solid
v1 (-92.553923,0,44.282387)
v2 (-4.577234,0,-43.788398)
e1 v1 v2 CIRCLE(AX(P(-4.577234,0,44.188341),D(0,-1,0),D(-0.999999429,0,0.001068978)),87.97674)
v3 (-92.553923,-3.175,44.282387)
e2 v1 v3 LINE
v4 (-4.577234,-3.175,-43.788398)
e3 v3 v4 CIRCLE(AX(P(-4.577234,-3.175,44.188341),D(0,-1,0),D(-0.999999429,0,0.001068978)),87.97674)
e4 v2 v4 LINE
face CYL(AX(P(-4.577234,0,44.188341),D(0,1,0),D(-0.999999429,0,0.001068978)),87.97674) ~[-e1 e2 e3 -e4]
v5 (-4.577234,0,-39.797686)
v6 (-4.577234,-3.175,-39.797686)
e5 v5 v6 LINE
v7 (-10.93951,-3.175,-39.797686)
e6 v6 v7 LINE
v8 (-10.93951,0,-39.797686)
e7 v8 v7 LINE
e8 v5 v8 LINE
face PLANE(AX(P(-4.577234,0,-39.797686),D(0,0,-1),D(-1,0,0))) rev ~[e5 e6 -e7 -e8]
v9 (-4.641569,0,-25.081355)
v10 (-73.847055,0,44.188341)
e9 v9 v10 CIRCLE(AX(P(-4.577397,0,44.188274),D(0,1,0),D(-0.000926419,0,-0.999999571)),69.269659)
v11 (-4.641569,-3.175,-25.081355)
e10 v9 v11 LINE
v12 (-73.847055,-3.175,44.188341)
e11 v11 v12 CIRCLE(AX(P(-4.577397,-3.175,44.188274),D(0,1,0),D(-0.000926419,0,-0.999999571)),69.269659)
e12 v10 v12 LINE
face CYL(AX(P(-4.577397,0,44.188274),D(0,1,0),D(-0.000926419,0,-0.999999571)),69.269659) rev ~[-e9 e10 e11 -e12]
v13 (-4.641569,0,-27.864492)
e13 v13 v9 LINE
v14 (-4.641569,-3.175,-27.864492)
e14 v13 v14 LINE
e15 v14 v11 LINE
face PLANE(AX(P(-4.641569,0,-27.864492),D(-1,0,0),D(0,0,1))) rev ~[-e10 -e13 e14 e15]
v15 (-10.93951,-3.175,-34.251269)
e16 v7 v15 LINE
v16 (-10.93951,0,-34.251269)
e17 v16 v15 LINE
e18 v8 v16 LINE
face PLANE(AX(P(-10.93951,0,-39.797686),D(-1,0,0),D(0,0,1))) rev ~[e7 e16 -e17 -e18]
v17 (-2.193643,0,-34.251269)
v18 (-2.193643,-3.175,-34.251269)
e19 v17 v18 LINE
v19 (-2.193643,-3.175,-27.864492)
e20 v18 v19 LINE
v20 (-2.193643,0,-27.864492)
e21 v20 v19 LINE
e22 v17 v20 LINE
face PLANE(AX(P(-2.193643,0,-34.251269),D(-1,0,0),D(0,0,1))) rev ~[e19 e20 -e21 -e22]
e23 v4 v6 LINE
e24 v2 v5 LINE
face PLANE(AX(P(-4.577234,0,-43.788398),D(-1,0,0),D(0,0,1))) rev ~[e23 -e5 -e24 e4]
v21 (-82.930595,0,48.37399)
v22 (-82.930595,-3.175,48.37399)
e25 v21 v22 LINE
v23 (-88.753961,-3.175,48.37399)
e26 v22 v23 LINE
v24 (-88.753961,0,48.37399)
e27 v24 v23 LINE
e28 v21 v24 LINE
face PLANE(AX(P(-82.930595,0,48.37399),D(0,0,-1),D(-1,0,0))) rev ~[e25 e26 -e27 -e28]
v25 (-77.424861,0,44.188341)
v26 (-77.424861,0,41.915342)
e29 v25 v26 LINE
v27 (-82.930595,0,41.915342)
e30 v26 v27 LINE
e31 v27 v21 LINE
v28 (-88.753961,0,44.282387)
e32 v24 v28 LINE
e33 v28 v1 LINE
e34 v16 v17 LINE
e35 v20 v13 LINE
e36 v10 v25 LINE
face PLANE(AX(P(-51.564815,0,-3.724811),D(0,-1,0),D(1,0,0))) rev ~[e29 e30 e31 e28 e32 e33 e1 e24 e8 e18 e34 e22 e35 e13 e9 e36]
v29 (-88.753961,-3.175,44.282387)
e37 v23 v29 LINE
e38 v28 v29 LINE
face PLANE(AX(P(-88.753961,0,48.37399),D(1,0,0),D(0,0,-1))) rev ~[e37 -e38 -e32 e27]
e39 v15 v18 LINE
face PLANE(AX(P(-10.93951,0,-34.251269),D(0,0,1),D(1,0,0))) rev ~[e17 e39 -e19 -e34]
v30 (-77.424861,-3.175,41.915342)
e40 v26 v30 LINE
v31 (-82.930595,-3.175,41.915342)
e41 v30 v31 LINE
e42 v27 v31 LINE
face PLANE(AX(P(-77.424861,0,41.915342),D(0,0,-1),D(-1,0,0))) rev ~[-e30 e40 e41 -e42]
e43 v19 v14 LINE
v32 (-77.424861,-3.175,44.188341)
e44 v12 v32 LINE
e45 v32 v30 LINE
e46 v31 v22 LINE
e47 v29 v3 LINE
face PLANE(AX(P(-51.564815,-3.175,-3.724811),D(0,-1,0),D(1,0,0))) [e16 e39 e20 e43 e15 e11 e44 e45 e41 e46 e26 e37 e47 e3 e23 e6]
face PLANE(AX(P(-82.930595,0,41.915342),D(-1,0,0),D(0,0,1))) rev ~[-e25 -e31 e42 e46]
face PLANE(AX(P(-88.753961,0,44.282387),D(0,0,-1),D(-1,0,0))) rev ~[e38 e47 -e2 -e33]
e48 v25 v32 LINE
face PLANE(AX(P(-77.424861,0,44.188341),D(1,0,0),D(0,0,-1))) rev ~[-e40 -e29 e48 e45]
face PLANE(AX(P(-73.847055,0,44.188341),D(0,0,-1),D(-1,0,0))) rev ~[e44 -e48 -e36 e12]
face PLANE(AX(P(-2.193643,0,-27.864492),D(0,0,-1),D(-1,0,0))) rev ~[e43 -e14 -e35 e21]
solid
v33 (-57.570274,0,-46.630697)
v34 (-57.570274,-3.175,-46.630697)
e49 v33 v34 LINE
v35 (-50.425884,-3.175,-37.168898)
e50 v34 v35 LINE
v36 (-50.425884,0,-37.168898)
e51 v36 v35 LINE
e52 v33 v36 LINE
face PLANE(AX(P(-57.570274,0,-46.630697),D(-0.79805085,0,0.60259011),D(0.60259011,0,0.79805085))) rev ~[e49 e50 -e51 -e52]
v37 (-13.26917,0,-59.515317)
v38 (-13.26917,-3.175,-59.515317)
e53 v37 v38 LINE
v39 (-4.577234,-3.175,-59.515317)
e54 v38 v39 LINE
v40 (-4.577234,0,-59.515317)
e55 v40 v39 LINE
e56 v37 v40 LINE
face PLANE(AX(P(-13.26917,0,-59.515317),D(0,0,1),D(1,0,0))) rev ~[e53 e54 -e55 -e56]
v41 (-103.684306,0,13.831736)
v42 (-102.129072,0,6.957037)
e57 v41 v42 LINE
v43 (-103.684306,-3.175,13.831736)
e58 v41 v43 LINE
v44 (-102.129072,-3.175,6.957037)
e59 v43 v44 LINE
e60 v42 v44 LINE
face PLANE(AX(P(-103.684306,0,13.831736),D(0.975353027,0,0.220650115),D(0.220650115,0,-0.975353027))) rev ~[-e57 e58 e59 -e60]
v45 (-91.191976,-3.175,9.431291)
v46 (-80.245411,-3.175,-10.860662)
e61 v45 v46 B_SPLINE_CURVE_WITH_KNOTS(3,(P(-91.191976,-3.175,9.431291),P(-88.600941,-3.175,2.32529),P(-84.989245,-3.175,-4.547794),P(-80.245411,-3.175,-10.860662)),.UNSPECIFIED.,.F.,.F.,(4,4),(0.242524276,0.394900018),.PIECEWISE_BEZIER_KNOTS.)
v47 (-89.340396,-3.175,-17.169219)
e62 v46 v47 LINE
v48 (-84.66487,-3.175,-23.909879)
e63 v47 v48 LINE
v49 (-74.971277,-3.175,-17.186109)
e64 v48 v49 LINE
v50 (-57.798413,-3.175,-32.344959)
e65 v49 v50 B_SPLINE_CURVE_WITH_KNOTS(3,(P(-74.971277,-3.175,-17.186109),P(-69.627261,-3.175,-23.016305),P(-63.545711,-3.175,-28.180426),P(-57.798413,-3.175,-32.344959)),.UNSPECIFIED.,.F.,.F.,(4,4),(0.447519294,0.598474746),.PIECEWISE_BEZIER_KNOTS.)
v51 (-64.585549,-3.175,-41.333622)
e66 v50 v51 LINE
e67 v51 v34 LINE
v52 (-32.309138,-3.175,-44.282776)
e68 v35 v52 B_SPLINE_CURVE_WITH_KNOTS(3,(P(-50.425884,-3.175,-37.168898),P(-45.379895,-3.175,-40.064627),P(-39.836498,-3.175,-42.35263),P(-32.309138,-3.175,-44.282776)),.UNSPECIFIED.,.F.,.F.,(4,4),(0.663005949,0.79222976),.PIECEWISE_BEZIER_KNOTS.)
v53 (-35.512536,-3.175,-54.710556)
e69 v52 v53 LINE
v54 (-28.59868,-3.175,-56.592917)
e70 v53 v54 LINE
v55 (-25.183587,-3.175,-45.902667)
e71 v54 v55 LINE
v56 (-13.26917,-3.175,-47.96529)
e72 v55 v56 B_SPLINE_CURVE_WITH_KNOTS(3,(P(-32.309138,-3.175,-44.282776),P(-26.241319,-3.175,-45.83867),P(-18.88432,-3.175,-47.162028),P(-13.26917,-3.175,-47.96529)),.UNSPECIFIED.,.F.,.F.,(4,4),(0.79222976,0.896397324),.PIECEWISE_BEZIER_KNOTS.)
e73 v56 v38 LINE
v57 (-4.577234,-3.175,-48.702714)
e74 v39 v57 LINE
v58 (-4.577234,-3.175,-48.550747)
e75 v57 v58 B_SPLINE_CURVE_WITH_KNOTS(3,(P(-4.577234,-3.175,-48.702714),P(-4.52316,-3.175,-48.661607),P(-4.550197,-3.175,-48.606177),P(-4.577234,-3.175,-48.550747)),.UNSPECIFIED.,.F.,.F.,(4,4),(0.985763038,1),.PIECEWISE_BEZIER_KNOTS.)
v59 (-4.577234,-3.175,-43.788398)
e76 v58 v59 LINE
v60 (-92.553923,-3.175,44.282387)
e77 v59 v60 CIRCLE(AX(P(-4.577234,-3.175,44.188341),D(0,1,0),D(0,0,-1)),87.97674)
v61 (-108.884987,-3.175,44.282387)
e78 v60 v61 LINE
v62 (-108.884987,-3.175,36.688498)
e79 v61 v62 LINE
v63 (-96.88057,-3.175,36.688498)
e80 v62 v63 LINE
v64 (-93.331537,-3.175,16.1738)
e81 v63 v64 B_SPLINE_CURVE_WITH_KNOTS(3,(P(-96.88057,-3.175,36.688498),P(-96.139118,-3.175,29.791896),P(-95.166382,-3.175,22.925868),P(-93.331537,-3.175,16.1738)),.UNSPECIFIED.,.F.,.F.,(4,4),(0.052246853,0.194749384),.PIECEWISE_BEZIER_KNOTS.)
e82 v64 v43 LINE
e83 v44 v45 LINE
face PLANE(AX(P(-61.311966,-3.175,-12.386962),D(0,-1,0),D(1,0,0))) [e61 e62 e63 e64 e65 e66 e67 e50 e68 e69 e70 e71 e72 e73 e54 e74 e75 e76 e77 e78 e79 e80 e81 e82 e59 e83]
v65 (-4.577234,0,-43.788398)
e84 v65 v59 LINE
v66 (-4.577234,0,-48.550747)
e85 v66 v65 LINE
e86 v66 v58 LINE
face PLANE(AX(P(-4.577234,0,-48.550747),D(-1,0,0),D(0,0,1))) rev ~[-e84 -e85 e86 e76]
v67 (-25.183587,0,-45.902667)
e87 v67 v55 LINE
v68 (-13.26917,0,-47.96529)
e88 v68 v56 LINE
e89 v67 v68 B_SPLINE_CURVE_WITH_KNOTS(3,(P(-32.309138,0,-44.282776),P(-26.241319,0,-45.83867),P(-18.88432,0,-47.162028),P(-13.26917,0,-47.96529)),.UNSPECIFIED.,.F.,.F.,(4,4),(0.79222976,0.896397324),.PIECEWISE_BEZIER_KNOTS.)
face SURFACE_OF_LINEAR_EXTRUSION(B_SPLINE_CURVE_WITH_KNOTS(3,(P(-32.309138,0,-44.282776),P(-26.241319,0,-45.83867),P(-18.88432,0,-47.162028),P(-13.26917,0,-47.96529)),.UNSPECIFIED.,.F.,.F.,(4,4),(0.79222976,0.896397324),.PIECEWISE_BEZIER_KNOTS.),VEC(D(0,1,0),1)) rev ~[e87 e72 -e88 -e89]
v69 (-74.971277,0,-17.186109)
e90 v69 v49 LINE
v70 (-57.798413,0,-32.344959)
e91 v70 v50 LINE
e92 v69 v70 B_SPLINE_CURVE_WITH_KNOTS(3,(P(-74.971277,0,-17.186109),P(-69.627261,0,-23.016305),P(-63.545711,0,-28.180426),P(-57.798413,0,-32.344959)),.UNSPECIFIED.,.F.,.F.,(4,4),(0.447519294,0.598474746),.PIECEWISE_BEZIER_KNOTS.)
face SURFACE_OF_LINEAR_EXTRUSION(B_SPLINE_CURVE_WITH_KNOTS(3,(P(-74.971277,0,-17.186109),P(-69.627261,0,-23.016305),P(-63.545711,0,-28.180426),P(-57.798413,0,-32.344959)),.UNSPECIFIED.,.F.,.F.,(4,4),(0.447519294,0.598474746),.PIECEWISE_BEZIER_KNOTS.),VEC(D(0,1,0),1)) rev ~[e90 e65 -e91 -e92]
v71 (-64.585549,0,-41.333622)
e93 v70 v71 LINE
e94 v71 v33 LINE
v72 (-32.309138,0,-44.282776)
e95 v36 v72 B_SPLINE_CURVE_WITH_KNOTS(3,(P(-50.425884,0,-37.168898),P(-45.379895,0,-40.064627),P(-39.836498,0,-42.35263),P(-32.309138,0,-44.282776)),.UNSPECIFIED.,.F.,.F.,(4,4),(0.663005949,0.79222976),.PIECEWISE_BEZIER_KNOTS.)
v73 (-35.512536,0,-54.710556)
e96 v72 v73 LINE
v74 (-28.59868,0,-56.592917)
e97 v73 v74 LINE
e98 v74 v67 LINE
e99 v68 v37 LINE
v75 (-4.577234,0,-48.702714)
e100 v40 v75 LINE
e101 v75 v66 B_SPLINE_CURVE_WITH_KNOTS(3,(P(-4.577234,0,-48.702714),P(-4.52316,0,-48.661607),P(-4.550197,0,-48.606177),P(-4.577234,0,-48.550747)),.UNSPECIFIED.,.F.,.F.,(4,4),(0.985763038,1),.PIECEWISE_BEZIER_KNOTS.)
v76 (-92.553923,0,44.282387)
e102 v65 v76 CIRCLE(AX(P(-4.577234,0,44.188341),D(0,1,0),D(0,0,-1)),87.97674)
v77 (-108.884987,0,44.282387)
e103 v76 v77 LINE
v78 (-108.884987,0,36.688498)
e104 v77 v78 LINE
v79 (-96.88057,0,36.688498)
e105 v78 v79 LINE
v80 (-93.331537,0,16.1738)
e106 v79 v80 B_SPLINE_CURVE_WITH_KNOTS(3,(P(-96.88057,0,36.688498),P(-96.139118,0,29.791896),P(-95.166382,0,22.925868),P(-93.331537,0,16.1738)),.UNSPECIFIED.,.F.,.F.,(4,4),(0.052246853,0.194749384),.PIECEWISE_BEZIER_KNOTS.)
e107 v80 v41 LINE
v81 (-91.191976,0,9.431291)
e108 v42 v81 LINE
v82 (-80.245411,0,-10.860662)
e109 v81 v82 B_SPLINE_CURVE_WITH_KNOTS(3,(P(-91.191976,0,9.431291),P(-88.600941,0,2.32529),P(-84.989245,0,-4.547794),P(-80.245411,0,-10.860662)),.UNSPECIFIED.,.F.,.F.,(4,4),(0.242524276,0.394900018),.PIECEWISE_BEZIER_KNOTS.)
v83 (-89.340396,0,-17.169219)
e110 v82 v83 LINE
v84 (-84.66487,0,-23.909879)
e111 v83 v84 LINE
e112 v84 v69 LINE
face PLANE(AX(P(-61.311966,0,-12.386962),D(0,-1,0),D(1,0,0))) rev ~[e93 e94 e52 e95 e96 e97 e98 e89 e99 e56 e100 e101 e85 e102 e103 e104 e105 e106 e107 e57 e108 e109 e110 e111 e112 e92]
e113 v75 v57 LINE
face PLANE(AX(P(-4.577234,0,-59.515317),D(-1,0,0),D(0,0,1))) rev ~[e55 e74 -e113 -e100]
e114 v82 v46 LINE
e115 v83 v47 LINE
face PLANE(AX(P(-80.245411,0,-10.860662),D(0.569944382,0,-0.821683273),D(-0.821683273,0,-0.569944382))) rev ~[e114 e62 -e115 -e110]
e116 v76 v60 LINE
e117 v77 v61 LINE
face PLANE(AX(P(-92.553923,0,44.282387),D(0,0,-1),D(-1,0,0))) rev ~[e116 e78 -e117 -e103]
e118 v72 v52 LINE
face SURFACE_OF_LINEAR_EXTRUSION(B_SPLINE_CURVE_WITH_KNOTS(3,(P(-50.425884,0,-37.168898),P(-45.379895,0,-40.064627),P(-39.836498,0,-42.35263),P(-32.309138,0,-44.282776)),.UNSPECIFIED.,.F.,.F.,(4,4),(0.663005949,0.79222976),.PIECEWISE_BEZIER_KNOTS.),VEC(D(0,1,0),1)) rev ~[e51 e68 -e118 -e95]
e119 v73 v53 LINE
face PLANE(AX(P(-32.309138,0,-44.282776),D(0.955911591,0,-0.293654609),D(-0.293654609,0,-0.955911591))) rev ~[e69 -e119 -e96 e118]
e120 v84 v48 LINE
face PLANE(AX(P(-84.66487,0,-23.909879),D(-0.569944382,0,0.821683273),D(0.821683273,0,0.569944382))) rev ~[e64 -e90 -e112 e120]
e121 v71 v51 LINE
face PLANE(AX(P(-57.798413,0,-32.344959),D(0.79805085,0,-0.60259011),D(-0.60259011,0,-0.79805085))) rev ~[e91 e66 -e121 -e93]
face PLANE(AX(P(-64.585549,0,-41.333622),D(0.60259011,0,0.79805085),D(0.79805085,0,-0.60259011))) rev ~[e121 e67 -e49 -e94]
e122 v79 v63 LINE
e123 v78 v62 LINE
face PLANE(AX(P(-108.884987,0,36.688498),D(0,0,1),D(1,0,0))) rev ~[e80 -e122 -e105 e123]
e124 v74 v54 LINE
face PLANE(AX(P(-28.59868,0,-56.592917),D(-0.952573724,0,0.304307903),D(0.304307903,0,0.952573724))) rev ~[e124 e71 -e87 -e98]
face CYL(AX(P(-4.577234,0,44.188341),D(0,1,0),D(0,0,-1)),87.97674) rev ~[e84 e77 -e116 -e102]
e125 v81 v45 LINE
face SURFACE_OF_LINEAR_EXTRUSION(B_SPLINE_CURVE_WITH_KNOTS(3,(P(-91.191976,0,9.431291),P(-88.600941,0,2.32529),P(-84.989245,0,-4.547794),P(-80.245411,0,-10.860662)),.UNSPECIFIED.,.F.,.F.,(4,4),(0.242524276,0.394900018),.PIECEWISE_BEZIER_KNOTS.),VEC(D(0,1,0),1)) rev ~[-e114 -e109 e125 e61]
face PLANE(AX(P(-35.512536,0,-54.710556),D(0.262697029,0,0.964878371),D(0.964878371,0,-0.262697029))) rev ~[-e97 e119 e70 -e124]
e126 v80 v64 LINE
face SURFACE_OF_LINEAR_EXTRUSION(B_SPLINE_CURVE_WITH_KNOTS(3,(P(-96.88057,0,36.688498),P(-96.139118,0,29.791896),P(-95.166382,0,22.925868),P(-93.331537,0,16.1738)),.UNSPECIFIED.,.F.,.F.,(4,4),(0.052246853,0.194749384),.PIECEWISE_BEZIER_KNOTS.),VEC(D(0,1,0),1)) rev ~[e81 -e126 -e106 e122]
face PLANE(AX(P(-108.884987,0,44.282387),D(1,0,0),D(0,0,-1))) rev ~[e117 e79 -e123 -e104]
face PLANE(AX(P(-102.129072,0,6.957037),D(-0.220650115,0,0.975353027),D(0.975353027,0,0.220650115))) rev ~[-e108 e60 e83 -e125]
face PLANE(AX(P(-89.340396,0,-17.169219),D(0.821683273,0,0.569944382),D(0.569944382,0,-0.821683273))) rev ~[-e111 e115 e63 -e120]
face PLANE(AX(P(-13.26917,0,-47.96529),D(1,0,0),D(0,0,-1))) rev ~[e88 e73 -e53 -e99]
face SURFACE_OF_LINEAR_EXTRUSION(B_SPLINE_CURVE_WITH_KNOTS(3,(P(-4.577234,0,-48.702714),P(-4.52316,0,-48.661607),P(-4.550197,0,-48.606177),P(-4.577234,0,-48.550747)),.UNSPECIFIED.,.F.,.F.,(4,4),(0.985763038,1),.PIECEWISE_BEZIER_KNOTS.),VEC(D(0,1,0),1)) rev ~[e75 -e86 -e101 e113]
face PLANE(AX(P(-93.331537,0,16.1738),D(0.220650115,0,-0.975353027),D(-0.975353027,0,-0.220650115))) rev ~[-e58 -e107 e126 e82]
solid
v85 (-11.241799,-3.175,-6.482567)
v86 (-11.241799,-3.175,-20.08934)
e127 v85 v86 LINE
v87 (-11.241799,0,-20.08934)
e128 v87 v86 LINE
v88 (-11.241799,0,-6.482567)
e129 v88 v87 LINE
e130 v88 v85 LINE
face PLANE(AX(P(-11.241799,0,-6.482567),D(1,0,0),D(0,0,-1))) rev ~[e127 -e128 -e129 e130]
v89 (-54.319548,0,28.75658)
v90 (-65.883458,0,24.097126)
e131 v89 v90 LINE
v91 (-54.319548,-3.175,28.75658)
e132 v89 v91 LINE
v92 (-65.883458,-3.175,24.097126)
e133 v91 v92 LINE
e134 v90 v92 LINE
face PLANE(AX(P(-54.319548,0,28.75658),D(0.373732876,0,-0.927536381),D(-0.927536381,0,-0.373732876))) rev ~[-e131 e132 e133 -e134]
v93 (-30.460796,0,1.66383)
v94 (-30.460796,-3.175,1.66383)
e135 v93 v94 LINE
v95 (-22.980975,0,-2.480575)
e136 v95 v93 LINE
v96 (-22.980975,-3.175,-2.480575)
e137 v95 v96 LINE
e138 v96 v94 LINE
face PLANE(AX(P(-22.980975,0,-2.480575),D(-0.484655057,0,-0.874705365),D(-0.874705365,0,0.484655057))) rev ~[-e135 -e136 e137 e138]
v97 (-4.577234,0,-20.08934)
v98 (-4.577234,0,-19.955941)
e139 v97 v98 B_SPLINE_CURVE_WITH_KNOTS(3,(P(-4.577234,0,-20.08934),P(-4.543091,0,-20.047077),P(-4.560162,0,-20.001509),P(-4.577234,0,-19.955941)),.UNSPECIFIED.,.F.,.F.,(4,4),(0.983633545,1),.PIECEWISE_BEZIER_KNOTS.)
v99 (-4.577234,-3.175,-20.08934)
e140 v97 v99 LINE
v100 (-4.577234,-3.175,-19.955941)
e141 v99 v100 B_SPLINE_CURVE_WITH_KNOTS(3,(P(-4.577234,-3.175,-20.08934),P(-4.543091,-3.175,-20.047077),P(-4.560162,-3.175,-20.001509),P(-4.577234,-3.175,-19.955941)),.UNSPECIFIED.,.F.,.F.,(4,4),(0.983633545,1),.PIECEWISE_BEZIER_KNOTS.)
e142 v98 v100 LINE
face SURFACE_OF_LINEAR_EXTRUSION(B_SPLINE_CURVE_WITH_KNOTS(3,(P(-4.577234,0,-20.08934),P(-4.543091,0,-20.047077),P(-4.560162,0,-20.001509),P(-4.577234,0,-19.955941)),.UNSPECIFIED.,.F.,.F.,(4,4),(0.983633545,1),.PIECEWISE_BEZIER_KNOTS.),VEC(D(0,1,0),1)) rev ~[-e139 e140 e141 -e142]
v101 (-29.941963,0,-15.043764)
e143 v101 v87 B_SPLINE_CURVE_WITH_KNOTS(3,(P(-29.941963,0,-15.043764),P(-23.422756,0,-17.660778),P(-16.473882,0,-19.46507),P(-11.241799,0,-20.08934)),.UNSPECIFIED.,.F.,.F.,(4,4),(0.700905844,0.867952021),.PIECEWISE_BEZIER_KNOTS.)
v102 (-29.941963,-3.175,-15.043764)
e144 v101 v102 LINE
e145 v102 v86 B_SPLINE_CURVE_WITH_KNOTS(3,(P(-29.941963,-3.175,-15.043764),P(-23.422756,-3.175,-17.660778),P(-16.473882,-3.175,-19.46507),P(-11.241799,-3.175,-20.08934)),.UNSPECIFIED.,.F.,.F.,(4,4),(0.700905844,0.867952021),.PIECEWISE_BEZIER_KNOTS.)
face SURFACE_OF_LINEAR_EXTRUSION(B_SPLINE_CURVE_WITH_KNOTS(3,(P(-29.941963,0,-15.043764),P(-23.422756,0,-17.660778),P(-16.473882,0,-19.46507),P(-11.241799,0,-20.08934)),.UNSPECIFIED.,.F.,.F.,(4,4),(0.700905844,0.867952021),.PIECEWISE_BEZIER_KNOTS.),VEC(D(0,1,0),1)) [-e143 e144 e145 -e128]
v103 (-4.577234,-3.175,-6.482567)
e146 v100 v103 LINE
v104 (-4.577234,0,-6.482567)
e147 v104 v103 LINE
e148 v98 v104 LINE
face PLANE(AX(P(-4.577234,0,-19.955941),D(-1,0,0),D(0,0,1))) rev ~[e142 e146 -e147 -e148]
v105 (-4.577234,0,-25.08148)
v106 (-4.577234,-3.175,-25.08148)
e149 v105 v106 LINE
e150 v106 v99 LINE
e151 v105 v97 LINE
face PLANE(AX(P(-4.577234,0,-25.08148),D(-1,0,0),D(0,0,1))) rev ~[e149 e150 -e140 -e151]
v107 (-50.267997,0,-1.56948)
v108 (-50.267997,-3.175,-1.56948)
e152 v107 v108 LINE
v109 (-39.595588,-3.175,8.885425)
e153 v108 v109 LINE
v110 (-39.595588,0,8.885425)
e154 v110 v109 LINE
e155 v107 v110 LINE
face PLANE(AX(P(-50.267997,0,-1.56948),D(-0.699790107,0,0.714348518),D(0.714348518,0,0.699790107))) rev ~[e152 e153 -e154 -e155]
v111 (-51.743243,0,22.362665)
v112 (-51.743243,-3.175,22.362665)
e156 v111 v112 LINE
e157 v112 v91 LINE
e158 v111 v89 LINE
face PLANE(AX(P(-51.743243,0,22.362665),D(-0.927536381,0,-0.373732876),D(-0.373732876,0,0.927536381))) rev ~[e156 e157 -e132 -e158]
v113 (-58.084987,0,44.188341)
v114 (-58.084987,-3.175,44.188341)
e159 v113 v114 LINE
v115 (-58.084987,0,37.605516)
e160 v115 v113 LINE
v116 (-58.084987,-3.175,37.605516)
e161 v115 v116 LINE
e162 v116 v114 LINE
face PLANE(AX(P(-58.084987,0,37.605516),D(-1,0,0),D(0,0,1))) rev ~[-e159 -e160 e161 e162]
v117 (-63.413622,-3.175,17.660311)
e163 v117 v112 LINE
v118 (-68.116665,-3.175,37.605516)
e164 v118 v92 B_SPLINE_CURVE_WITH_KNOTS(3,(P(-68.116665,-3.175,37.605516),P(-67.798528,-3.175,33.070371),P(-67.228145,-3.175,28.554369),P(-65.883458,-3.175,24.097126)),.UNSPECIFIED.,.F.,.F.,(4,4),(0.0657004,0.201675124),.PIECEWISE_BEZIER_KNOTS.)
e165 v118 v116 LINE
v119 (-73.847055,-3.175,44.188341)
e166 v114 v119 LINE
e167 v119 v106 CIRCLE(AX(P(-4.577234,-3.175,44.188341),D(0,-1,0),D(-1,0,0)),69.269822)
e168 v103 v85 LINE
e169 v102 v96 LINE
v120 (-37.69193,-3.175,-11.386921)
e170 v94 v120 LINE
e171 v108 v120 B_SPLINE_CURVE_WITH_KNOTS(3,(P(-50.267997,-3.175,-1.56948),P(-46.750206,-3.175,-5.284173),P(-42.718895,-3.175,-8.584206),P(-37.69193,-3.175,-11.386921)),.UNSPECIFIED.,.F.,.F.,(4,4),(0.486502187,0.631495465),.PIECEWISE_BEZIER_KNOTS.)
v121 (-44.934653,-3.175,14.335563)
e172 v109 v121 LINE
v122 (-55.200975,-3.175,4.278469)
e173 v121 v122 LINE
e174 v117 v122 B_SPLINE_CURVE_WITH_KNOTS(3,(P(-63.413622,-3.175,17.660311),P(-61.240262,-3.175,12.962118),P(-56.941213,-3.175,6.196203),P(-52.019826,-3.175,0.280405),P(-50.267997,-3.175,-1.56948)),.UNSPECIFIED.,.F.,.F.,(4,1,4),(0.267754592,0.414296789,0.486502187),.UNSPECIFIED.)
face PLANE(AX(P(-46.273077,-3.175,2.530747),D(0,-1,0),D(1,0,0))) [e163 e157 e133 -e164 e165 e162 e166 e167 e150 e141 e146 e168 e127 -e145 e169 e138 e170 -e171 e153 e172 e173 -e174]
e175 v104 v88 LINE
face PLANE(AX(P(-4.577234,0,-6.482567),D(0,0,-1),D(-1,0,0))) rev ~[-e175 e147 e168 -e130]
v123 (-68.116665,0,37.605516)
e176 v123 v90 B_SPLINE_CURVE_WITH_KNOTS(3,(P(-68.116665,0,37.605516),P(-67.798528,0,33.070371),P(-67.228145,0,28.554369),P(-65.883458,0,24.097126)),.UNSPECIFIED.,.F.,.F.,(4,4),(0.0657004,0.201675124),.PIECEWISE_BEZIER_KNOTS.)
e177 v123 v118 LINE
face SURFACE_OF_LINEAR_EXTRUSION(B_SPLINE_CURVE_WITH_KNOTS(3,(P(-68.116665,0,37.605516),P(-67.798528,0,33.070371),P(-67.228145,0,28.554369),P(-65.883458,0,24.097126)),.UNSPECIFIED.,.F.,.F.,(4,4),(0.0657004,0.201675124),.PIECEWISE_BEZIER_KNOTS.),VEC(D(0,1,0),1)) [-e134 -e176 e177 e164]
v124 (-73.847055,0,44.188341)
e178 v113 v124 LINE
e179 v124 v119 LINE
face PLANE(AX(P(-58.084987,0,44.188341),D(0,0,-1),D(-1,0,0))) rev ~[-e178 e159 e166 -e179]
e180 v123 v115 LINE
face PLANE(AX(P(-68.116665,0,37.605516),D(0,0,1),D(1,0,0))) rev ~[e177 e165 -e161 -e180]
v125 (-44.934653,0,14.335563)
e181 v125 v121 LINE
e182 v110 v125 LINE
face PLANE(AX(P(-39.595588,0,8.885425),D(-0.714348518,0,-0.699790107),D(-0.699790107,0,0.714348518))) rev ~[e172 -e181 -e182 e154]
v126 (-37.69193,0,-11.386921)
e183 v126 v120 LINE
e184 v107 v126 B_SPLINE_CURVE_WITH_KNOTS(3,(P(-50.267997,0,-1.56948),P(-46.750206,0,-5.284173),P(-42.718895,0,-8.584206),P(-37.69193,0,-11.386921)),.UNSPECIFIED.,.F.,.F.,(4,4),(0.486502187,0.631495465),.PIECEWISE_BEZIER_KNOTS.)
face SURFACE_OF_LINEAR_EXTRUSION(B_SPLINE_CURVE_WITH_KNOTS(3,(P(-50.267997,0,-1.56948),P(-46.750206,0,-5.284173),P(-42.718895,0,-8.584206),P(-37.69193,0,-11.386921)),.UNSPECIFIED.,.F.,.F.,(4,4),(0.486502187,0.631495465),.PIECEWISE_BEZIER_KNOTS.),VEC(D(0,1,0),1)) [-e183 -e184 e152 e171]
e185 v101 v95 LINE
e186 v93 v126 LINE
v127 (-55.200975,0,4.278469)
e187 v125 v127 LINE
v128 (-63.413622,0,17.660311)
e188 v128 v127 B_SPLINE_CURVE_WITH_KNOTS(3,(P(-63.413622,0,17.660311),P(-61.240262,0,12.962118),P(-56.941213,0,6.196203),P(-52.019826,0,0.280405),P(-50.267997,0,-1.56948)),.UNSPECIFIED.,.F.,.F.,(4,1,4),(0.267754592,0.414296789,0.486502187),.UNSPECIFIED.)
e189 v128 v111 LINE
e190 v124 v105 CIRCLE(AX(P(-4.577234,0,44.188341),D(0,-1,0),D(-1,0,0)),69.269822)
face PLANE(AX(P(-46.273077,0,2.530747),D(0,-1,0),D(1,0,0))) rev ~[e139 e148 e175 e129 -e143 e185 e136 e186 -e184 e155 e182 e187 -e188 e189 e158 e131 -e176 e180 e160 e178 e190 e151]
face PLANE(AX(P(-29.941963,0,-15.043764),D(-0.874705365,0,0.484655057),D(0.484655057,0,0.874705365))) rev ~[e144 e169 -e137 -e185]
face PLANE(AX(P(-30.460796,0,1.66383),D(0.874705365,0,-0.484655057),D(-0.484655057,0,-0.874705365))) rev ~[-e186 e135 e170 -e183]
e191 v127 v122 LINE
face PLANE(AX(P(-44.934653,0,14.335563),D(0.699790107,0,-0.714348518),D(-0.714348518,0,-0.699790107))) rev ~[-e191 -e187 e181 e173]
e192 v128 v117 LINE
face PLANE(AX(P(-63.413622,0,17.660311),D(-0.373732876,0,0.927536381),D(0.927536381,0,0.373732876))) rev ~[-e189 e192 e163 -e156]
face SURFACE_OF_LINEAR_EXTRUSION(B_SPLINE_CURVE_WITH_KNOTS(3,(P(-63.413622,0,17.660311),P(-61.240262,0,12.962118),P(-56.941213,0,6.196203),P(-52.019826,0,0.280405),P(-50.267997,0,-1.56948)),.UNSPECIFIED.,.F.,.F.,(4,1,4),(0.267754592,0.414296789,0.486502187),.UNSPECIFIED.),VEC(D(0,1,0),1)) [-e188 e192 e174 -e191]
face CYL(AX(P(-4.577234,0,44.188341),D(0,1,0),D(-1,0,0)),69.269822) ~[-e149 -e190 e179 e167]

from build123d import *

# Parameters (mm, degrees)
F1_DEPTH = 3.175
F3_DEPTH = 3.175


# Not quite as in the source:
# - ends of sketch curves that miss each other by under 0.0002 mm in the source are joined


with BuildPart() as f1:
    # F0 (on Front) → F1 (new body)
    with BuildSketch(Plane.XZ):
        with BuildLine():
            ThreePointArc((-4.57723355, -43.7883980573), (-66.819423743, -17.9873487673), (-92.5539227851, 44.2823866067))
            Line((-92.5539227851, 44.2823866067), (-97.6339227851, 44.2823866067))
            add(Edge.make_bspline(
                [(-97.6339227851, 44.2823866067), (-97.3931684107, 41.7497203339), (-97.1524140363, 39.2170540611), (-96.8805696251, 36.6884975094)],
                knots=[0, 0, 0, 0, 0.0522468531, 0.0522468531, 0.0522468531, 0.0522468531], degree=3))
            add(Edge.make_bspline(
                [(-96.8805696251, 36.6884975094), (-96.1391179528, 29.7918963404), (-95.1663820006, 22.9258681136), (-93.3315372634, 16.1738000838)],
                knots=[0.0522468531, 0.0522468531, 0.0522468531, 0.0522468531, 0.194749384, 0.194749384, 0.194749384, 0.194749384], degree=3))
            add(Edge.make_bspline(
                [(-93.3315372634, 16.1738000838), (-92.7163937389, 13.910125757), (-92.0043518732, 11.6592602013), (-91.1919757647, 9.4312911762)],
                knots=[0.194749384, 0.194749384, 0.194749384, 0.194749384, 0.242524276, 0.242524276, 0.242524276, 0.242524276], degree=3))
            add(Edge.make_bspline(
                [(-91.1919757647, 9.4312911762), (-88.6009408677, 2.3252901097), (-84.9892452149, -4.5477935635), (-80.2454108338, -10.8606620469)],
                knots=[0.242524276, 0.242524276, 0.242524276, 0.242524276, 0.394900018, 0.394900018, 0.394900018, 0.394900018], degree=3))
            add(Edge.make_bspline(
                [(-80.2454108338, -10.8606620469), (-78.607242384, -13.0406584688), (-76.8340664871, -15.1538492769), (-74.9712769181, -17.1861090489)],
                knots=[0.394900018, 0.394900018, 0.394900018, 0.394900018, 0.4475192945, 0.4475192945, 0.4475192945, 0.4475192945], degree=3))
            add(Edge.make_bspline(
                [(-74.9712769181, -17.1861090489), (-69.6272612199, -23.016304958), (-63.5457113797, -28.1804261391), (-57.7984134089, -32.3449592406)],
                knots=[0.4475192945, 0.4475192945, 0.4475192945, 0.4475192945, 0.5984747456, 0.5984747456, 0.5984747456, 0.5984747456], degree=3))
            add(Edge.make_bspline(
                [(-57.7984134089, -32.3449592406), (-55.3415292823, -34.1252350021), (-52.9457275098, -35.7228425466), (-50.4258841879, -37.168898271)],
                knots=[0.5984747456, 0.5984747456, 0.5984747456, 0.5984747456, 0.6630059486, 0.6630059486, 0.6630059486, 0.6630059486], degree=3))
            add(Edge.make_bspline(
                [(-50.4258841879, -37.168898271), (-45.3798949167, -40.0646265916), (-39.8364976619, -42.3526304388), (-32.3091378654, -44.2827760941)],
                knots=[0.6630059486, 0.6630059486, 0.6630059486, 0.6630059486, 0.7922297598, 0.7922297598, 0.7922297598, 0.7922297598], degree=3))
            add(Edge.make_bspline(
                [(-32.3091378654, -44.2827760941), (-30.0596561185, -44.8595822437), (-27.6329950376, -45.4044295862), (-25.1835874199, -45.9026667789)],
                knots=[0.7922297598, 0.7922297598, 0.7922297598, 0.7922297598, 0.8308470987, 0.8308470987, 0.8308470987, 0.8308470987], degree=3))
            add(Edge.make_bspline(
                [(-25.1835874199, -45.9026667789), (-21.0258896893, -46.7483894877), (-16.802653084, -47.4598158509), (-13.2691699484, -47.9652898008)],
                knots=[0.8308470987, 0.8308470987, 0.8308470987, 0.8308470987, 0.8963973245, 0.8963973245, 0.8963973245, 0.8963973245], degree=3))
            add(Edge.make_bspline(
                [(-13.2691699484, -47.9652898008), (-8.4519136222, -48.6544108435), (-4.916655331, -48.9607420913), (-4.57723355, -48.70271393)],
                knots=[0.8963973245, 0.8963973245, 0.8963973245, 0.8963973245, 0.9857630376, 0.9857630376, 0.9857630376, 0.9857630376], degree=3))
            Line((-4.57723355, -48.70271393), (-4.57723355, -48.5507466091))
            Line((-4.57723355, -48.5507466091), (-4.57723355, -43.7883980573))
        make_face()
        with BuildLine():
            add(Edge.make_bspline(
                [(-97.6339227851, 44.2823866067), (-97.3931684107, 41.7497203339), (-97.1524140363, 39.2170540611), (-96.8805696251, 36.6884975094)],
                knots=[0, 0, 0, 0, 0.0522468531, 0.0522468531, 0.0522468531, 0.0522468531], degree=3))
            Line((-97.6339227851, 44.2823866067), (-108.8849874868, 44.2823866067))
            Line((-108.8849874868, 44.2823866067), (-108.8849874868, 36.6884975094))
            Line((-108.8849874868, 36.6884975094), (-96.8805696251, 36.6884975094))
        make_face()
        with BuildLine():
            add(Edge.make_bspline(
                [(-4.57723355, -48.70271393), (-4.5231598458, -48.6616071441), (-4.5501966979, -48.6061768766), (-4.57723355, -48.5507466091)],
                knots=[0.9857630376, 0.9857630376, 0.9857630376, 0.9857630376, 1, 1, 1, 1], degree=3))
            Line((-4.57723355, -48.5507466091), (-4.57723355, -48.70271393))
        make_face()
        with BuildLine():
            Line((-4.57723355, -59.5153173973), (-4.57723355, -48.70271393))
            add(Edge.make_bspline(
                [(-13.2691699484, -47.9652898008), (-8.4519136222, -48.6544108435), (-4.916655331, -48.9607420913), (-4.57723355, -48.70271393)],
                knots=[0.8963973245, 0.8963973245, 0.8963973245, 0.8963973245, 0.9857630376, 0.9857630376, 0.9857630376, 0.9857630376], degree=3))
            Line((-13.2691699484, -47.9652898008), (-13.2691699484, -59.5153173973))
            Line((-13.2691699484, -59.5153173973), (-4.57723355, -59.5153173973))
        make_face()
        with BuildLine():
            add(Edge.make_bspline(
                [(-93.3315372634, 16.1738000838), (-92.7163937389, 13.910125757), (-92.0043518732, 11.6592602013), (-91.1919757647, 9.4312911762)],
                knots=[0.194749384, 0.194749384, 0.194749384, 0.194749384, 0.242524276, 0.242524276, 0.242524276, 0.242524276], degree=3))
            Line((-93.3315372634, 16.1738000838), (-103.6843064573, 13.8317355646))
            Line((-103.6843064573, 13.8317355646), (-102.1290715587, 6.9570368465))
            Line((-102.1290715587, 6.9570368465), (-91.1919757647, 9.4312911762))
        make_face()
        with BuildLine():
            Line((-28.5986802118, -56.592917115), (-25.1835874199, -45.9026667789))
            add(Edge.make_bspline(
                [(-32.3091378654, -44.2827760941), (-30.0596561185, -44.8595822437), (-27.6329950376, -45.4044295862), (-25.1835874199, -45.9026667789)],
                knots=[0.7922297598, 0.7922297598, 0.7922297598, 0.7922297598, 0.8308470987, 0.8308470987, 0.8308470987, 0.8308470987], degree=3))
            Line((-32.3091378654, -44.2827760941), (-35.5125362565, -54.710556085))
            Line((-35.5125362565, -54.710556085), (-28.5986802118, -56.592917115))
        make_face()
        with BuildLine():
            add(Edge.make_bspline(
                [(-80.2454108338, -10.8606620469), (-78.607242384, -13.0406584688), (-76.8340664871, -15.1538492769), (-74.9712769181, -17.1861090489)],
                knots=[0.394900018, 0.394900018, 0.394900018, 0.394900018, 0.4475192945, 0.4475192945, 0.4475192945, 0.4475192945], degree=3))
            Line((-80.2454108338, -10.8606620469), (-89.3403956863, -17.1692187548))
            Line((-89.3403956863, -17.1692187548), (-84.6648700593, -23.9098785797))
            Line((-84.6648700593, -23.9098785797), (-74.9712769181, -17.1861090489))
        make_face()
        with BuildLine():
            Line((-57.5702740184, -46.6306970593), (-50.4258841879, -37.168898271))
            add(Edge.make_bspline(
                [(-57.7984134089, -32.3449592406), (-55.3415292823, -34.1252350021), (-52.9457275098, -35.7228425466), (-50.4258841879, -37.168898271)],
                knots=[0.5984747456, 0.5984747456, 0.5984747456, 0.5984747456, 0.6630059486, 0.6630059486, 0.6630059486, 0.6630059486], degree=3))
            Line((-57.7984134089, -32.3449592406), (-64.5855489224, -41.3336219678))
            Line((-64.5855489224, -41.3336219678), (-57.5702740184, -46.6306970593))
        make_face()
    extrude(amount=F1_DEPTH)


with BuildPart() as f1b:
    # F0 (on Front) → F1, piece 2 (new body)
    with BuildSketch(Plane.XZ):
        with BuildLine():
            Line((-68.460035245, 44.188341444), (-73.8470553452, 44.188341444))
            ThreePointArc((-73.8470553452, 44.188341444), (-53.5583942729, -4.792819279), (-4.57723355, -25.0814803512))
            Line((-4.57723355, -25.0814803512), (-4.57723355, -20.089340043))
            add(Edge.make_bspline(
                [(-11.2417986909, -20.089340043), (-7.6185165541, -20.5216548463), (-4.8185609122, -20.3880627705), (-4.57723355, -20.089340043)],
                knots=[0.8679520206, 0.8679520206, 0.8679520206, 0.8679520206, 0.9836335446, 0.9836335446, 0.9836335446, 0.9836335446], degree=3))
            add(Edge.make_bspline(
                [(-29.9419627206, -15.043763619), (-23.422756241, -17.6607776775), (-16.4738824823, -19.4650697847), (-11.2417986909, -20.089340043)],
                knots=[0.7009058442, 0.7009058442, 0.7009058442, 0.7009058442, 0.8679520206, 0.8679520206, 0.8679520206, 0.8679520206], degree=3))
            add(Edge.make_bspline(
                [(-37.6919303949, -11.3869210218), (-35.2854498907, -12.7286211423), (-32.6507981172, -13.9563520855), (-29.9419627206, -15.043763619)],
                knots=[0.6314954647, 0.6314954647, 0.6314954647, 0.6314954647, 0.7009058442, 0.7009058442, 0.7009058442, 0.7009058442], degree=3))
            add(Edge.make_bspline(
                [(-50.2679967336, -1.5694799865), (-46.7502062379, -5.2841732571), (-42.7188946441, -8.5842062158), (-37.6919303949, -11.3869210218)],
                knots=[0.486502187, 0.486502187, 0.486502187, 0.486502187, 0.6314954647, 0.6314954647, 0.6314954647, 0.6314954647], degree=3))
            add(Edge.make_bspline(
                [(-55.2009748713, 4.2784686576), (-53.6443043314, 2.2331240714), (-52.019825963, 0.2804051212), (-50.2679967336, -1.5694799865)],
                knots=[0.4142967892, 0.4142967892, 0.4142967892, 0.4142967892, 0.486502187, 0.486502187, 0.486502187, 0.486502187], degree=3))
            add(Edge.make_bspline(
                [(-63.4136220682, 17.660311036), (-61.2402617068, 12.9621183463), (-58.3602666711, 8.429533519), (-55.2009748713, 4.2784686576)],
                knots=[0.2677545922, 0.2677545922, 0.2677545922, 0.2677545922, 0.4142967892, 0.4142967892, 0.4142967892, 0.4142967892], degree=3))
            add(Edge.make_bspline(
                [(-65.8834584942, 24.0971257956), (-65.2299828846, 21.9310450164), (-64.3936435193, 19.7788412618), (-63.4136220682, 17.660311036)],
                knots=[0.2016751241, 0.2016751241, 0.2016751241, 0.2016751241, 0.2677545922, 0.2677545922, 0.2677545922, 0.2677545922], degree=3))
            add(Edge.make_bspline(
                [(-68.1166645486, 37.6055160739), (-67.7985284224, 33.0703711751), (-67.2281449465, 28.5543686299), (-65.8834584942, 24.0971257956)],
                knots=[0.0657004003, 0.0657004003, 0.0657004003, 0.0657004003, 0.2016751241, 0.2016751241, 0.2016751241, 0.2016751241], degree=3))
            add(Edge.make_bspline(
                [(-68.460035245, 44.188341444), (-68.3652085595, 41.992576638), (-68.270381874, 39.7968118321), (-68.1166645486, 37.6055160739)],
                knots=[0, 0, 0, 0, 0.0657004003, 0.0657004003, 0.0657004003, 0.0657004003], degree=3))
        make_face()
        with BuildLine():
            Line((-58.0849874868, 44.188341444), (-68.460035245, 44.188341444))
            add(Edge.make_bspline(
                [(-68.460035245, 44.188341444), (-68.3652085595, 41.992576638), (-68.270381874, 39.7968118321), (-68.1166645486, 37.6055160739)],
                knots=[0, 0, 0, 0, 0.0657004003, 0.0657004003, 0.0657004003, 0.0657004003], degree=3))
            Line((-68.1166645486, 37.6055160739), (-58.0849874868, 37.6055160739))
            Line((-58.0849874868, 37.6055160739), (-58.0849874868, 44.188341444))
        make_face()
        with BuildLine():
            add(Edge.make_bspline(
                [(-11.2417986909, -20.089340043), (-7.6185165541, -20.5216548463), (-4.8185609122, -20.3880627705), (-4.57723355, -20.089340043)],
                knots=[0.8679520206, 0.8679520206, 0.8679520206, 0.8679520206, 0.9836335446, 0.9836335446, 0.9836335446, 0.9836335446], degree=3))
            Line((-4.57723355, -20.089340043), (-4.57723355, -19.9559408889))
            Line((-4.57723355, -19.9559408889), (-4.57723355, -6.4825667786))
            Line((-4.57723355, -6.4825667786), (-11.2417986909, -6.4825667786))
            Line((-11.2417986909, -6.4825667786), (-11.2417986909, -20.089340043))
        make_face()
        with BuildLine():
            Line((-4.57723355, -19.9559408889), (-4.57723355, -20.089340043))
            add(Edge.make_bspline(
                [(-4.57723355, -20.089340043), (-4.5430909024, -20.0470771818), (-4.5601622262, -20.0015090354), (-4.57723355, -19.9559408889)],
                knots=[0.9836335446, 0.9836335446, 0.9836335446, 0.9836335446, 1, 1, 1, 1], degree=3))
        make_face()
        with BuildLine():
            Line((-54.3195477878, 28.7565803399), (-65.8834584942, 24.0971257956))
            add(Edge.make_bspline(
                [(-65.8834584942, 24.0971257956), (-65.2299828846, 21.9310450164), (-64.3936435193, 19.7788412618), (-63.4136220682, 17.660311036)],
                knots=[0.2016751241, 0.2016751241, 0.2016751241, 0.2016751241, 0.2677545922, 0.2677545922, 0.2677545922, 0.2677545922], degree=3))
            Line((-63.4136220682, 17.660311036), (-51.7432430301, 22.3626649389))
            Line((-51.7432430301, 22.3626649389), (-54.3195477878, 28.7565803399))
        make_face()
        with BuildLine():
            add(Edge.make_bspline(
                [(-37.6919303949, -11.3869210218), (-35.2854498907, -12.7286211423), (-32.6507981172, -13.9563520855), (-29.9419627206, -15.043763619)],
                knots=[0.6314954647, 0.6314954647, 0.6314954647, 0.6314954647, 0.7009058442, 0.7009058442, 0.7009058442, 0.7009058442], degree=3))
            Line((-29.9419627206, -15.043763619), (-22.9809752827, -2.4805746691))
            Line((-22.9809752827, -2.4805746691), (-30.460795653, 1.6638297367))
            Line((-30.460795653, 1.6638297367), (-37.6919303949, -11.3869210218))
        make_face()
        with BuildLine():
            Line((-44.9346528444, 14.3355632134), (-55.2009748713, 4.2784686576))
            add(Edge.make_bspline(
                [(-55.2009748713, 4.2784686576), (-53.6443043314, 2.2331240714), (-52.019825963, 0.2804051212), (-50.2679967336, -1.5694799865)],
                knots=[0.4142967892, 0.4142967892, 0.4142967892, 0.4142967892, 0.486502187, 0.486502187, 0.486502187, 0.486502187], degree=3))
            Line((-50.2679967336, -1.5694799865), (-39.5955882998, 8.8854249421))
            Line((-39.5955882998, 8.8854249421), (-44.9346528444, 14.3355632134))
        make_face()
    extrude(amount=F1_DEPTH)


with BuildPart() as f3:
    # F2 (on Front) → F3 (new body)
    with BuildSketch(Plane.XZ):
        with BuildLine():
            Line((-88.7539610267, 44.2823866067), (-92.5539227851, 44.2823866067))
            ThreePointArc((-92.5539227851, 44.2823866067), (-66.819423743, -17.9873487673), (-4.57723355, -43.7883980573))
            Line((-4.57723355, -43.7883980573), (-4.57723355, -39.7976860404))
            Line((-4.57723355, -39.7976860404), (-10.9395096079, -39.7976860404))
            Line((-10.9395096079, -39.7976860404), (-10.9395096079, -34.2512689531))
            Line((-10.9395096079, -34.2512689531), (-2.193643013, -34.2512689531))
            Line((-2.193643013, -34.2512689531), (-2.193643013, -27.864491567))
            Line((-2.193643013, -27.864491567), (-4.6415692195, -27.864491567))
            Line((-4.6415692195, -27.864491567), (-4.6415692195, -25.0813551247))
            ThreePointArc((-4.6415692195, -25.0813551247), (-53.5811351193, -4.7700678696), (-73.8470553452, 44.188341444))
            Line((-73.8470553452, 44.188341444), (-77.4248614907, 44.188341444))
            Line((-77.4248614907, 44.188341444), (-77.4248614907, 41.9153422117))
            Line((-77.4248614907, 41.9153422117), (-82.9305946827, 41.9153422117))
            Line((-82.9305946827, 41.9153422117), (-82.9305946827, 48.3739897609))
            Line((-82.9305946827, 48.3739897609), (-88.7539610267, 48.3739897609))
            Line((-88.7539610267, 48.3739897609), (-88.7539610267, 44.2823866067))
        make_face()
    extrude(amount=F3_DEPTH)


solid = Compound([f1.part, f1b.part, f3.part])
